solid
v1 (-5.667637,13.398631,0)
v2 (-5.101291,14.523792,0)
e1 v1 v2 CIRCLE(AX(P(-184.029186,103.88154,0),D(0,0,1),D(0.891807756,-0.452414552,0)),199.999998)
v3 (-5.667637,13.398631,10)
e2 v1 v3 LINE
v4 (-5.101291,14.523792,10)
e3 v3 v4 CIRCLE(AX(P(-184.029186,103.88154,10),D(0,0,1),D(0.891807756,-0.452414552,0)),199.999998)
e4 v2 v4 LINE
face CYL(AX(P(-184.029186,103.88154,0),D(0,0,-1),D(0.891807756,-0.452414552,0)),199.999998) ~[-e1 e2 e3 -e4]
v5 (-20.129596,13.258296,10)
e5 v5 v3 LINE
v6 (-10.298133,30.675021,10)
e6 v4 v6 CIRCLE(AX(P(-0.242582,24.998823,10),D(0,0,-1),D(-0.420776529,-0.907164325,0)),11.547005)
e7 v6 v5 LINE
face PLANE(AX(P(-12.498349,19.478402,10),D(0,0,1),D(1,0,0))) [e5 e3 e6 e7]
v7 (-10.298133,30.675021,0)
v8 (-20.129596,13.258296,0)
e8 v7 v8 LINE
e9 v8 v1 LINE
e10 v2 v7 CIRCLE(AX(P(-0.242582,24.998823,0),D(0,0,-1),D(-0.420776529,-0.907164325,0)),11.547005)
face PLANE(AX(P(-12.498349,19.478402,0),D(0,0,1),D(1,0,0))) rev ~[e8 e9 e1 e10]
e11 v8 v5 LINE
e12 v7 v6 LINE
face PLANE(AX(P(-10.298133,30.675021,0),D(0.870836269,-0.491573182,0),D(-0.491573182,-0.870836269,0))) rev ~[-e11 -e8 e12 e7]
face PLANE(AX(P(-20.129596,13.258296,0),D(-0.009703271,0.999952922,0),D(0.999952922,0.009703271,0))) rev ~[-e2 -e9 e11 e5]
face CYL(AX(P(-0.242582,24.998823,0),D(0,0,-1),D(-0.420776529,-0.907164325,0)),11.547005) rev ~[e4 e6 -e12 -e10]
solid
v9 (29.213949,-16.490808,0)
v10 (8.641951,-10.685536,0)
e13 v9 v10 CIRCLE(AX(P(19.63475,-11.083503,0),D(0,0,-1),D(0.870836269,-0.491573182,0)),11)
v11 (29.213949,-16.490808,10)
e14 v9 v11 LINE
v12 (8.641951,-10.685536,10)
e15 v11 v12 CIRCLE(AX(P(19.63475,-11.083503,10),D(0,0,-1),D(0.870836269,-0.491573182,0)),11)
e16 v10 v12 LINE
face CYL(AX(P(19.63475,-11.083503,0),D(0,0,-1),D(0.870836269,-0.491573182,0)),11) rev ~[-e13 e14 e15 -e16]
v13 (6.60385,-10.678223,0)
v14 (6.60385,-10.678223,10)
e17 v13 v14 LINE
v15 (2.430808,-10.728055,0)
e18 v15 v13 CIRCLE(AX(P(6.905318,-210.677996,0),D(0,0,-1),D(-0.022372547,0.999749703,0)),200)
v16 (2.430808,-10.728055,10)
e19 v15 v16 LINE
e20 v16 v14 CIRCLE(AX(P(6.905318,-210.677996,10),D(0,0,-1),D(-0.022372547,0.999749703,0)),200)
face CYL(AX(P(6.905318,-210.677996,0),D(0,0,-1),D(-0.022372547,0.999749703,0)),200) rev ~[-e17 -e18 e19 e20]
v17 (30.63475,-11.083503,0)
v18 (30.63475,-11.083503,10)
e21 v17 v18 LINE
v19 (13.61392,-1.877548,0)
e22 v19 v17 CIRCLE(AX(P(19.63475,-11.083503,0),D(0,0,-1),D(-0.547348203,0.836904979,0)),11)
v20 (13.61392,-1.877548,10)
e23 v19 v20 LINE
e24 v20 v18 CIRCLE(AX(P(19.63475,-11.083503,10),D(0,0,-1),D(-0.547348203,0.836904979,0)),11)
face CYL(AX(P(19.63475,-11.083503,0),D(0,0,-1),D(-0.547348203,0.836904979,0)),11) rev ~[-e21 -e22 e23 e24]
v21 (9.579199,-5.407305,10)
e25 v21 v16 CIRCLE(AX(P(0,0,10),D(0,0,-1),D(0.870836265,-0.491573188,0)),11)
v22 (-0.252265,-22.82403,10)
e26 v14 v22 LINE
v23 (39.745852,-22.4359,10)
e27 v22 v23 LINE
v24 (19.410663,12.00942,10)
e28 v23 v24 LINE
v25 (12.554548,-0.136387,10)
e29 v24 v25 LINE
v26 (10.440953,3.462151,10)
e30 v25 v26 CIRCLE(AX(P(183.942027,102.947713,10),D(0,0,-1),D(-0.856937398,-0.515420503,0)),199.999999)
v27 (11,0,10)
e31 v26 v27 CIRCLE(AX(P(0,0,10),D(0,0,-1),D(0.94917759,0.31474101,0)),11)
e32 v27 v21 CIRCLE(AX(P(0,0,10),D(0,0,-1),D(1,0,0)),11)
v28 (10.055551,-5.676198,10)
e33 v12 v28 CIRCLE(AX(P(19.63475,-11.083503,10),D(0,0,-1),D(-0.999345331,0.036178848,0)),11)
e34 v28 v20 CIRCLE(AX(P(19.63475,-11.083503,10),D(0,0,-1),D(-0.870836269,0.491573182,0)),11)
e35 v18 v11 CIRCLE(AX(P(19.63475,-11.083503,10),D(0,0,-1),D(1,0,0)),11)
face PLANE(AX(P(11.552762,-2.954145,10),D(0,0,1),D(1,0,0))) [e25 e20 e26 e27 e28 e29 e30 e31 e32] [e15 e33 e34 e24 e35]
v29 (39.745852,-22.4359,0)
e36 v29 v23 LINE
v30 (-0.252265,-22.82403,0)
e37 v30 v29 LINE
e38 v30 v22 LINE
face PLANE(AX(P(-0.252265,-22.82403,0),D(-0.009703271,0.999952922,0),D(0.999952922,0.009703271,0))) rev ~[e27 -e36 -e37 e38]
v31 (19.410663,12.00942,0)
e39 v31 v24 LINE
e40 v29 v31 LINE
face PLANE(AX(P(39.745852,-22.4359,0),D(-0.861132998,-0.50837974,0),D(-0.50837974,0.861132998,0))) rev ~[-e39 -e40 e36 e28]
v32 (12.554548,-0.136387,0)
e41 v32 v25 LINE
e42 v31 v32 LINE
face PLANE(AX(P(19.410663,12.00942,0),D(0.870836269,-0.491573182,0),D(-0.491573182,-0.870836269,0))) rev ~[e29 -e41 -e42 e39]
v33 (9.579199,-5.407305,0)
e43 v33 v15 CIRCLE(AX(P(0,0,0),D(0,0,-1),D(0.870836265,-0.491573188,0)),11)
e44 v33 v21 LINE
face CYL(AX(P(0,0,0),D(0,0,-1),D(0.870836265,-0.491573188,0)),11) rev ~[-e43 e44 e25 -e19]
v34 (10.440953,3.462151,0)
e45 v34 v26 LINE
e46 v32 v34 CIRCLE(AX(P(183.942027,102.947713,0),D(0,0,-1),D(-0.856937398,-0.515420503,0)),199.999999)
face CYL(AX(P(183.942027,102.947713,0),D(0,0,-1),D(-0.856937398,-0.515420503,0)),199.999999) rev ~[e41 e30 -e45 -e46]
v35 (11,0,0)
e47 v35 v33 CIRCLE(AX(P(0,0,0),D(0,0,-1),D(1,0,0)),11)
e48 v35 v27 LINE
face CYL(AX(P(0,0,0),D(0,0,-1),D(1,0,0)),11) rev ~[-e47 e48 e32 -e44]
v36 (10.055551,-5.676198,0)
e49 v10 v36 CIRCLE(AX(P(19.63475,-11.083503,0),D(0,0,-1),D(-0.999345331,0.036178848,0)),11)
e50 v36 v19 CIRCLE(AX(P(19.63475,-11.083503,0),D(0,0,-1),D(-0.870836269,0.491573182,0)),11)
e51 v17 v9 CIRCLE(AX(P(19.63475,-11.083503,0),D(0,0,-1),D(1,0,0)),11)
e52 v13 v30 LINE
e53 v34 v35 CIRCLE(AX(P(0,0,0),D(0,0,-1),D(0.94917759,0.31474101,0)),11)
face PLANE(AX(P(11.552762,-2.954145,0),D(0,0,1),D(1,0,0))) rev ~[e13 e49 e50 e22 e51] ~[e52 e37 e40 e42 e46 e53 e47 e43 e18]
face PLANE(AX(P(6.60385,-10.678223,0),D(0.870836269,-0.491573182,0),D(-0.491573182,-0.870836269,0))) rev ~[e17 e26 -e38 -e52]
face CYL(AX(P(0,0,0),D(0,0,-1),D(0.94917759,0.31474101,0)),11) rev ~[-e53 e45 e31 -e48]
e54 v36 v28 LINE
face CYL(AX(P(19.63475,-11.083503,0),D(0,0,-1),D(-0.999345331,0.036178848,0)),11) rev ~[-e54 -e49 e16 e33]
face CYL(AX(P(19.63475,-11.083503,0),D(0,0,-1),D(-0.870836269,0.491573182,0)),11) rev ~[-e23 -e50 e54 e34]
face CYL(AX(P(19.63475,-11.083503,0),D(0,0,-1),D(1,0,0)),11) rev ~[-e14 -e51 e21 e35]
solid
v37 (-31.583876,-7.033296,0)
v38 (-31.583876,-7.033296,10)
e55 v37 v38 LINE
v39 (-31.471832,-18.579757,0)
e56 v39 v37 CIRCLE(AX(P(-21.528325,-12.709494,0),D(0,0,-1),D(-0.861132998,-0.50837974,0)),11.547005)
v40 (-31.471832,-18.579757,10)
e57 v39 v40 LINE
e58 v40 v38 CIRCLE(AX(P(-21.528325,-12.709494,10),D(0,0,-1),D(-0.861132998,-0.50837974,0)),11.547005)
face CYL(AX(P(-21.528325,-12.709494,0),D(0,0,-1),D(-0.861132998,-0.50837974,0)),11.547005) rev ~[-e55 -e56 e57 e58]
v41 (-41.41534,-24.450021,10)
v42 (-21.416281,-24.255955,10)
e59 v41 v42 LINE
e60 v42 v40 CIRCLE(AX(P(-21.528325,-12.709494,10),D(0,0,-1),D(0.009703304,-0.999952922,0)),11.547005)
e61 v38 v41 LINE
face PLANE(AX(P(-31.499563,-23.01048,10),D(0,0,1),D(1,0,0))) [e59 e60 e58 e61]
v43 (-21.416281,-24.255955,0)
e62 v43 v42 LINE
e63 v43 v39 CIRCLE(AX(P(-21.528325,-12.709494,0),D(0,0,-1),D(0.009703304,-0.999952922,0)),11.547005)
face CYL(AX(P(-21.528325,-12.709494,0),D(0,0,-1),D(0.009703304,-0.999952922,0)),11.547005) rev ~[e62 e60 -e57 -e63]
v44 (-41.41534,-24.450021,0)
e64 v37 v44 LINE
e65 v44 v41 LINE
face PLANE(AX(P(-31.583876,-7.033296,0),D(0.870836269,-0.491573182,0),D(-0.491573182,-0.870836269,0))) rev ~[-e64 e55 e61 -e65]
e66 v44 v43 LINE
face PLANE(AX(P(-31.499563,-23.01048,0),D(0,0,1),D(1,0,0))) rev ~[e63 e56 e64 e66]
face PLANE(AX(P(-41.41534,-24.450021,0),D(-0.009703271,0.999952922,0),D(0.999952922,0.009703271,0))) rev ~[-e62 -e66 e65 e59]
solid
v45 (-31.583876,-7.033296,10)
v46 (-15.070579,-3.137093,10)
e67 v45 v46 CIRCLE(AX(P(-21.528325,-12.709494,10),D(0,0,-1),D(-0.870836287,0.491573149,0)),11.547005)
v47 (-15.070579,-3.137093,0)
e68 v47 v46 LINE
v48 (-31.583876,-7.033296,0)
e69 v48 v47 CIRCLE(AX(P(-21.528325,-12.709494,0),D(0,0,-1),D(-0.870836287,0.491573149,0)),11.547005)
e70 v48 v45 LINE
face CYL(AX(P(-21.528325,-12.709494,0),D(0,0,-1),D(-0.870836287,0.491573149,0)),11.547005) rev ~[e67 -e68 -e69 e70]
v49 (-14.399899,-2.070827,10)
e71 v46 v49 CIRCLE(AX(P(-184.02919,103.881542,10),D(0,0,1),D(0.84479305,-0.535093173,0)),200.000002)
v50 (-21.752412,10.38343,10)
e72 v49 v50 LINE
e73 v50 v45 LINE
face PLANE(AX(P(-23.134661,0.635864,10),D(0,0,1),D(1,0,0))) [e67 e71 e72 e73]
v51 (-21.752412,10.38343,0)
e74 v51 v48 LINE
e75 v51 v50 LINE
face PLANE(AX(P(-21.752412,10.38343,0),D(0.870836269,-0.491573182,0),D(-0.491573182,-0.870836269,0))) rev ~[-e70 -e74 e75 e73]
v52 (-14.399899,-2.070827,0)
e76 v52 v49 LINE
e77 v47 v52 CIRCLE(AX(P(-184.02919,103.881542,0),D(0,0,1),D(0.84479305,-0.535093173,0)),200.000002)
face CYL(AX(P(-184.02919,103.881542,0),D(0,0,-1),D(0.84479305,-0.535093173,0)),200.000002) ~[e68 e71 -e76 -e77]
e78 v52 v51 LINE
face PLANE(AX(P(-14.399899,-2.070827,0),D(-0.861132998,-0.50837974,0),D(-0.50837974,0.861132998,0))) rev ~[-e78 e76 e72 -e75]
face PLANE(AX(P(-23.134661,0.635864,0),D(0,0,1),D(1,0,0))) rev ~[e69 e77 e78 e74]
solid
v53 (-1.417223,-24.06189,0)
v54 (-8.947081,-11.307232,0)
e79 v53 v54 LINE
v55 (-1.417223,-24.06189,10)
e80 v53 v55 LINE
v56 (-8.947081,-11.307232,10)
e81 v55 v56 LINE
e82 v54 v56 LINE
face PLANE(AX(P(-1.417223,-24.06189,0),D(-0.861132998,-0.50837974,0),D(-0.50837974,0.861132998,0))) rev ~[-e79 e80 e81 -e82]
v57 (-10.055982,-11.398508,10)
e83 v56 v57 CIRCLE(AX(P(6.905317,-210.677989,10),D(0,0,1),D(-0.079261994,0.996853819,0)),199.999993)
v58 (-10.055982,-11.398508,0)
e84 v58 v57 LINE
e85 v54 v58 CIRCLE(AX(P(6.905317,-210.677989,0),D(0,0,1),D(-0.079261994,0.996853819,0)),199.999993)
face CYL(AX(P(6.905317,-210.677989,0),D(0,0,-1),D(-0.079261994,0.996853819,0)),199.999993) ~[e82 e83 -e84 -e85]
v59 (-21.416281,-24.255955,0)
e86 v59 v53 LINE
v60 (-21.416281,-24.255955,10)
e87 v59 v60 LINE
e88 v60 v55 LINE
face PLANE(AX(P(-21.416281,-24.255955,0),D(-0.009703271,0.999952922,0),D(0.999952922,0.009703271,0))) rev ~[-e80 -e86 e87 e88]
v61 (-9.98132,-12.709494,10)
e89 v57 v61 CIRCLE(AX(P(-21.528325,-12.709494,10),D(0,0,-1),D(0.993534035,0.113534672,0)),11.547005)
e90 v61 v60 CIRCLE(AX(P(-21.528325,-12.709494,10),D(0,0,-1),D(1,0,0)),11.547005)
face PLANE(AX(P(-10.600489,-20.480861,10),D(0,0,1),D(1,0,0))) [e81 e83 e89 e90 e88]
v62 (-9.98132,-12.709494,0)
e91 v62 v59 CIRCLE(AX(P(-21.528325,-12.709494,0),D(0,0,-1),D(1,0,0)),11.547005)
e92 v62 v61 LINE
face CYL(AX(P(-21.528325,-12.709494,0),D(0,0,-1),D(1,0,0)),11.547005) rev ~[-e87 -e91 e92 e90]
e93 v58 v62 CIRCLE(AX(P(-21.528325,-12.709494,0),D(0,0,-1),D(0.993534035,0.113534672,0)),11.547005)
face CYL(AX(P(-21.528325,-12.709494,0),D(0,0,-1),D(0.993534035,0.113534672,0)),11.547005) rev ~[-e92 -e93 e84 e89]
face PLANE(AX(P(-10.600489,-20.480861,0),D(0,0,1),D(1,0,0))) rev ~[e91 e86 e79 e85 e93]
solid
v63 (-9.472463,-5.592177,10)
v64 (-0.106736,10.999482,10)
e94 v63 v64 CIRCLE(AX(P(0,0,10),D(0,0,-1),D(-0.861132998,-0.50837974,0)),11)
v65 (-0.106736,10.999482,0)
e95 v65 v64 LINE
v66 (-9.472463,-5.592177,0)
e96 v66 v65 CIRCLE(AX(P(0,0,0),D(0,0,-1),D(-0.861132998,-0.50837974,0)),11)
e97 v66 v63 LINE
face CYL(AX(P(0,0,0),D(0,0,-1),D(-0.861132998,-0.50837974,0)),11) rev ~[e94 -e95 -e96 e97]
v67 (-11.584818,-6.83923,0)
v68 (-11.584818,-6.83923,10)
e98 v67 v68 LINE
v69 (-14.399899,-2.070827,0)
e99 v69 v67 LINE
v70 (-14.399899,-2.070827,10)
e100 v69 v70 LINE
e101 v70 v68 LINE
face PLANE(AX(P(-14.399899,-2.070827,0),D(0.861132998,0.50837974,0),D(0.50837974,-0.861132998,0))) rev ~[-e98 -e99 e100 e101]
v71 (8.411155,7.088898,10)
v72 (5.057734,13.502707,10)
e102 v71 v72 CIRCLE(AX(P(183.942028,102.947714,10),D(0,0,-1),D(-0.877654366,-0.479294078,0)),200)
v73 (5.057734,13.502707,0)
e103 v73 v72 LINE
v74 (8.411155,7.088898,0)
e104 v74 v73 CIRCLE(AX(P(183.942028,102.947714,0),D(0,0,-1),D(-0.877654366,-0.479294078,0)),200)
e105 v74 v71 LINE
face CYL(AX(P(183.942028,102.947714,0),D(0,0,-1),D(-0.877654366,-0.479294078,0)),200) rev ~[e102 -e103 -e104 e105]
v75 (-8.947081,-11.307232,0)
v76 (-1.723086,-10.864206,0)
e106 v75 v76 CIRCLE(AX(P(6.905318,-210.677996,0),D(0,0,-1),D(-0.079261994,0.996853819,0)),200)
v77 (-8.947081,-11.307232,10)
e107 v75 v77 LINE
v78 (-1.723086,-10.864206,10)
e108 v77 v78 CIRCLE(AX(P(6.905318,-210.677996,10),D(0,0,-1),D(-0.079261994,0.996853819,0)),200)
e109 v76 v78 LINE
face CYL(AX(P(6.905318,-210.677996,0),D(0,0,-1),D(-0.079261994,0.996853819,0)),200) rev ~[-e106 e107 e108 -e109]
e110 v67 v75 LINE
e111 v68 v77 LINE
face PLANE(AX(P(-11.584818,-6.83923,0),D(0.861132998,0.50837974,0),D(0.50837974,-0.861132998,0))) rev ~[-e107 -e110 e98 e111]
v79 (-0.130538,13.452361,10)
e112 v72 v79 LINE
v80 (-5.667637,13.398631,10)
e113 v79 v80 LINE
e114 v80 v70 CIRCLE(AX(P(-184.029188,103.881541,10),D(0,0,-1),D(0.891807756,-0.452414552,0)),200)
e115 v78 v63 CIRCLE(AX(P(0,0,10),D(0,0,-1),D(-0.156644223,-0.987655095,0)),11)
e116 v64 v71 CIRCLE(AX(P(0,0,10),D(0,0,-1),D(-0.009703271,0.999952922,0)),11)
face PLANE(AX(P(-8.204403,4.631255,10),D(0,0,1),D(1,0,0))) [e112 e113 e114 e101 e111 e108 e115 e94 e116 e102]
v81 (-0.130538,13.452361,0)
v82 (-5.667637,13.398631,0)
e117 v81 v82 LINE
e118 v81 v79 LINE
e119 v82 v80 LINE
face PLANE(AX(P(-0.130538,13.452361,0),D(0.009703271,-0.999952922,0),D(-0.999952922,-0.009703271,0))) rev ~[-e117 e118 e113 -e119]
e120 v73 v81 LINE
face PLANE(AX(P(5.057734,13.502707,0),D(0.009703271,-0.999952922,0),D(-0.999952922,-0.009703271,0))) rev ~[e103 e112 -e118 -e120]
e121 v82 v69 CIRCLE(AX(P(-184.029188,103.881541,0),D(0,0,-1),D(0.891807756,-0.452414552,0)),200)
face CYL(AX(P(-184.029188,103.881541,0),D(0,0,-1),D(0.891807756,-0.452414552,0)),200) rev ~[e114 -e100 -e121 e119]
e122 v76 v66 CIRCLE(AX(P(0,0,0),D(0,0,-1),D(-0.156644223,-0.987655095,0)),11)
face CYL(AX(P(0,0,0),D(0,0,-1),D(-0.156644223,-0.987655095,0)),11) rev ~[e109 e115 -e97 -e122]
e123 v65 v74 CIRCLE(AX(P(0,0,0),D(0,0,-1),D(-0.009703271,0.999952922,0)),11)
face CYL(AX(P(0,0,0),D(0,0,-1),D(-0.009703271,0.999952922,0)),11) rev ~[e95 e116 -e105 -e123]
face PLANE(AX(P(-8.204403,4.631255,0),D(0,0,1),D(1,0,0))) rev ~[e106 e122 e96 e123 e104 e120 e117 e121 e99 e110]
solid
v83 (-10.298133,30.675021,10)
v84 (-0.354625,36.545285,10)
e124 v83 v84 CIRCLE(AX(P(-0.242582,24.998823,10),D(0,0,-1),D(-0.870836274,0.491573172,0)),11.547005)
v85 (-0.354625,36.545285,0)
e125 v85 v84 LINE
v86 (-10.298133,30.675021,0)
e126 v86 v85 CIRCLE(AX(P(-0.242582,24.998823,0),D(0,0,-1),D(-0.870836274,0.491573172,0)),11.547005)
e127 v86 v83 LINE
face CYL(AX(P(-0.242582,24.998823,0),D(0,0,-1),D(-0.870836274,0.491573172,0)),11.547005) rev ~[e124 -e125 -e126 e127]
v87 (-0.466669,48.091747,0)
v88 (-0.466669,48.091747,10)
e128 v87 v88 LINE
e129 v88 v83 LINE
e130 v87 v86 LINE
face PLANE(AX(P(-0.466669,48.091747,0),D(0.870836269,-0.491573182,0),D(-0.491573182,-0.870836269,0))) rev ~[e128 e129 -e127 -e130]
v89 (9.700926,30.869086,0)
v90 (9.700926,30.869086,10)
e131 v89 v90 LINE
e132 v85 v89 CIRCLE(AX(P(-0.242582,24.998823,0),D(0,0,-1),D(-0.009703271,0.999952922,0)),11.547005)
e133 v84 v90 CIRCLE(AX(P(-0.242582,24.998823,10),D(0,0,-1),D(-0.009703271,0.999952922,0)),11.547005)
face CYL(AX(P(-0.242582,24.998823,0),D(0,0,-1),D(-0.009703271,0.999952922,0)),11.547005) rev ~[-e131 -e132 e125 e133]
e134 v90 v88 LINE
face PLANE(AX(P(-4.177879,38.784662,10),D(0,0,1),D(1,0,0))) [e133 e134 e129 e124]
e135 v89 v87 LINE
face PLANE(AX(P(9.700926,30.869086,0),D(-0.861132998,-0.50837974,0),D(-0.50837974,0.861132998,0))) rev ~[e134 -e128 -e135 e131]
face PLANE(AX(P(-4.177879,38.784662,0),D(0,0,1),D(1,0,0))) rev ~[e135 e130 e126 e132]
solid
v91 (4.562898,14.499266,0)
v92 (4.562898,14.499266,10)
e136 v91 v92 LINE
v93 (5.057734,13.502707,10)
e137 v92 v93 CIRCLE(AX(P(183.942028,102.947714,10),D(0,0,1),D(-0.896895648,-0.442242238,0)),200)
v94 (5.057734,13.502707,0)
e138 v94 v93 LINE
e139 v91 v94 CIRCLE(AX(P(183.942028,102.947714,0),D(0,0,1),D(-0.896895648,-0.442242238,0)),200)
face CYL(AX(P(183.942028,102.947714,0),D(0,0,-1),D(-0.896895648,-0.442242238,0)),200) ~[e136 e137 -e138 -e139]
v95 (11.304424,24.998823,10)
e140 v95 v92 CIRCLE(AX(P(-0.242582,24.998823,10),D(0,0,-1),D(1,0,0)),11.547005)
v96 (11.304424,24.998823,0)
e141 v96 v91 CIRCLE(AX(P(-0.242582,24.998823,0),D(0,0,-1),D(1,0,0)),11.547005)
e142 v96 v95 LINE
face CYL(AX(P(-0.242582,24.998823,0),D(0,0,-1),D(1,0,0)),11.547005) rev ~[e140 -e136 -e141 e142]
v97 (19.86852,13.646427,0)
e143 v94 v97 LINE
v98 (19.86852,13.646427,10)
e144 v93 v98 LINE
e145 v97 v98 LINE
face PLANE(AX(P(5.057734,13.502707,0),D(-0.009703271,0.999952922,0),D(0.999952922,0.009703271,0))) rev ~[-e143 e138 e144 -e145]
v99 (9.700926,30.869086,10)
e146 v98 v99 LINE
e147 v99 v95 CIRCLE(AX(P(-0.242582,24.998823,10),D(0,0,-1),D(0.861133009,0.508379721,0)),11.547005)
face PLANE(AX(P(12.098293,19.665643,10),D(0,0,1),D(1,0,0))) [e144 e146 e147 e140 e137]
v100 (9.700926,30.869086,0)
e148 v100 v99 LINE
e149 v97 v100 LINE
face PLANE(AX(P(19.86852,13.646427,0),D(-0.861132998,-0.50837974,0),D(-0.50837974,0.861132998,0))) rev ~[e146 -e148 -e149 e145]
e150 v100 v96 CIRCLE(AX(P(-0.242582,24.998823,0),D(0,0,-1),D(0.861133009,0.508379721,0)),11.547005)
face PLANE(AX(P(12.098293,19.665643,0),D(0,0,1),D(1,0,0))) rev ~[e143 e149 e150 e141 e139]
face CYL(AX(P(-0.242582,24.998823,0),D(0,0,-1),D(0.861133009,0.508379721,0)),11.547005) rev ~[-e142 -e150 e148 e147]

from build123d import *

# Parameters (mm, degrees)
F1_DEPTH = 10


with BuildPart() as f1:
    # F0 (on Top) → F1 (new body)
    with BuildSketch(Plane.XY):
        with BuildLine():
            ThreePointArc((-9.4724629741, -5.5921771434), (-9.5791989557, 5.4073050003), (-0.1067359816, 10.9994821437))
            Line((-0.1067359816, 10.9994821437), (-0.1305380532, 13.4523612782))
            Line((-0.1305380315, 13.4523612785), (-5.6676372798, 13.3986307741))
            ThreePointArc((-5.6676372798, 13.3986307741), (-9.8619346797, 5.5669048062), (-14.3998991761, -2.070826568))
            Line((-14.3998991761, -2.070826568), (-11.5848176191, -6.8392298452))
            Line((-11.5848175812, -6.8392299094), (-9.4724629741, -5.5921771434))
        make_face()
        with BuildLine():
            Line((-0.1305380532, 13.4523612782), (-0.1067359816, 10.9994821437))
            ThreePointArc((-0.1067359816, 10.9994821437), (4.5895542781, 9.9967990641), (8.4111545556, 7.0888982954))
            ThreePointArc((8.4111545556, 7.0888982954), (6.7054289822, 10.2806322034), (5.0577336181, 13.5027068547))
            Line((5.0577336181, 13.5027068547), (-0.1305380315, 13.4523612785))
        make_face()
        with BuildLine():
            ThreePointArc((-1.7230864536, -10.8642060489), (-6.1873786002, -9.0948527233), (-9.4724629741, -5.5921771434))
            Line((-9.4724629741, -5.5921771434), (-11.5848175812, -6.8392299094))
            Line((-11.5848176191, -6.8392298452), (-8.9470811973, -11.3072321903))
            ThreePointArc((-8.9470811973, -11.3072321903), (-5.3370880091, -11.0530388546), (-1.7230864536, -10.8642060489))
        make_face()
    extrude(amount=F1_DEPTH)


with BuildPart() as f1b:
    # F0 (on Top) → F1, piece 2 (new body)
    with BuildSketch(Plane.XY):
        with BuildLine():
            Line((12.5545481824, -0.1363868252), (9.5791989174, -5.4073050681))
            Line((9.5791989557, -5.4073050003), (10.0555510831, -5.6761981773))
            ThreePointArc((10.0555510831, -5.6761981773), (11.606819874, -3.563374371), (13.6139198008, -1.8775484067))
            ThreePointArc((13.6139198008, -1.8775484067), (13.0820160477, -1.0083170753), (12.5545481824, -0.1363868252))
        make_face()
        with BuildLine():
            Line((6.6038497291, -10.6782231755), (9.5791989174, -5.4073050681))
            ThreePointArc((9.5791989174, -5.4073050681), (6.5679269383, -8.8239637201), (2.4308083201, -10.7280553182))
            ThreePointArc((2.4308083201, -10.7280553182), (4.517199042, -10.692254253), (6.6038497291, -10.6782231755))
        make_face()
        with BuildLine():
            Line((10.0555510831, -5.6761981773), (9.5791989557, -5.4073050003))
            Line((9.5791989174, -5.4073050681), (6.6038497291, -10.6782231755))
            ThreePointArc((6.6038497291, -10.6782231755), (7.6229098775, -10.6792833185), (8.6419513958, -10.6855358516))
            ThreePointArc((8.6419513958, -10.6855358516), (9.0481954867, -8.0960523053), (10.0555510831, -5.6761981773))
        make_face()
        with BuildLine():
            ThreePointArc((11, 0), (10.6388718408, -2.7954258985), (9.5791989174, -5.4073050681))
            Line((9.5791989174, -5.4073050681), (12.5545481824, -0.1363868252))
            ThreePointArc((12.5545481824, -0.1363868252), (11.4883643789, 1.6573690273), (10.4409534845, 3.4621511137))
            ThreePointArc((10.4409534845, 3.4621511137), (10.8593390298, 1.7534981708), (11, 0))
        make_face()
        with BuildLine():
            ThreePointArc((8.6419513958, -10.6855358516), (7.6229098775, -10.6792833185), (6.6038497291, -10.6782231755))
            Line((6.6038497291, -10.6782231755), (-0.2522646812, -22.8240303744))
            Line((-0.2522646812, -22.8240303744), (39.7458522051, -22.4358995322))
            Line((39.7458522051, -22.4358995322), (19.4106625927, 12.0094203738))
            Line((19.4106625927, 12.0094203738), (12.5545481824, -0.1363868252))
            ThreePointArc((12.5545481824, -0.1363868252), (13.0820160477, -1.0083170753), (13.6139198008, -1.8775484067))
            ThreePointArc((13.6139198008, -1.8775484067), (24.8678594101, -1.4080411055), (30.6347500389, -11.0835031776))
            ThreePointArc((30.6347500389, -11.0835031776), (30.2736218896, -13.8789290385), (29.2139489946, -16.4908081779))
            ThreePointArc((29.2139489946, -16.4908081779), (16.6472991665, -21.6700577298), (8.6419513958, -10.6855358516))
        make_face()
    extrude(amount=F1_DEPTH)


with BuildPart() as f1c:
    # F0 (on Top) → F1, piece 3 (new body)
    with BuildSketch(Plane.XY):
        with BuildLine():
            ThreePointArc((-5.6676372798, 13.3986307741), (-5.3835781261, 13.9607653638), (-5.1012906228, 14.5237917089))
            ThreePointArc((-5.1012906228, 14.5237917089), (-11.2345943606, 21.4620176196), (-10.2981329222, 30.6750211202))
            Line((-10.2981329222, 30.6750211202), (-20.1295964964, 13.2582958572))
            Line((-20.1295964964, 13.2582958572), (-5.6676372798, 13.3986307741))
        make_face()
    extrude(amount=F1_DEPTH)


with BuildPart() as f1d:
    # F0 (on Top) → F1, piece 4 (new body)
    with BuildSketch(Plane.XY):
        with BuildLine():
            ThreePointArc((11.3044236075, 24.9988230539), (9.473956651, 18.7600560024), (4.5628983325, 14.4992661939))
            ThreePointArc((4.5628983325, 14.4992661939), (4.8096229597, 14.0006424117), (5.0577336181, 13.5027068547))
            Line((5.0577336181, 13.5027068547), (19.8685203899, 13.6464266993))
            Line((19.8685203899, 13.6464266993), (9.7009257177, 30.8690864252))
            ThreePointArc((9.7009257177, 30.8690864252), (10.8963380075, 28.0414862595), (11.3044236075, 24.9988230539))
        make_face()
    extrude(amount=F1_DEPTH)


with BuildPart() as f1e:
    # F0 (on Top) → F1, piece 5 (new body)
    with BuildSketch(Plane.XY):
        with BuildLine():
            ThreePointArc((-8.9470811973, -11.3072321903), (-9.501595119, -11.3520989755), (-10.0559820928, -11.3985080385))
            ThreePointArc((-10.0559820928, -11.3985080385), (-10.0000003021, -12.0529385986), (-9.9813195575, -12.7094935078))
            ThreePointArc((-9.9813195575, -12.7094935078), (-13.3238411908, -20.8347491789), (-21.4162808358, -24.2559552797))
            Line((-21.4162808358, -24.2559552797), (-1.417222775, -24.0618898624))
            Line((-1.417222775, -24.0618898624), (-8.9470811973, -11.3072321903))
        make_face()
    extrude(amount=F1_DEPTH)


with BuildPart() as f1f:
    # F0 (on Top) → F1, piece 6 (new body)
    with BuildSketch(Plane.XY):
        with BuildLine():
            ThreePointArc((-31.5838762413, -7.0332957148), (-24.1799561682, -1.471069011), (-15.0705785167, -3.1370933673))
            ThreePointArc((-15.0705785167, -3.1370933673), (-14.7343993878, -2.6044879851), (-14.3998991761, -2.070826568))
            Line((-14.3998991761, -2.070826568), (-21.7524123874, 10.3834300436))
            Line((-21.7524123874, 10.3834300436), (-31.5838762413, -7.0332957148))
        make_face()
    extrude(amount=F1_DEPTH)


with BuildPart() as f1g:
    # F0 (on Top) → F1, piece 7 (new body)
    with BuildSketch(Plane.XY):
        with BuildLine():
            ThreePointArc((-10.2981329222, 30.6750211202), (-6.1128454296, 34.9423303815), (-0.3546254994, 36.5452848296))
            Line((-0.3546254994, 36.5452848296), (-0.4666692225, 48.0917466053))
            Line((-0.4666692225, 48.0917466053), (-10.2981329222, 30.6750211202))
        make_face()
        with BuildLine():
            Line((-0.4666692225, 48.0917466053), (-0.3546254994, 36.5452848296))
            ThreePointArc((-0.3546254994, 36.5452848296), (5.4336165158, 35.0543740722), (9.7009257177, 30.8690864252))
            Line((9.7009257177, 30.8690864252), (-0.4666692225, 48.0917466053))
        make_face()
    extrude(amount=F1_DEPTH)


with BuildPart() as f1h:
    # F0 (on Top) → F1, piece 8 (new body)
    with BuildSketch(Plane.XY):
        with BuildLine():
            ThreePointArc((-21.4162808358, -24.2559552797), (-27.204522952, -22.7650446849), (-31.4718323013, -18.5797571062))
            Line((-31.4718323013, -18.5797571062), (-41.4153396613, -24.4500207045))
            Line((-41.4153396613, -24.4500207045), (-21.4162808358, -24.2559552797))
        make_face()
        with BuildLine():
            Line((-41.4153396613, -24.4500207045), (-31.4718323013, -18.5797571062))
            ThreePointArc((-31.4718323013, -18.5797571062), (-33.0747867148, -12.8215374515), (-31.5838762413, -7.0332957148))
            Line((-31.5838762413, -7.0332957148), (-41.4153396613, -24.4500207045))
        make_face()
    extrude(amount=F1_DEPTH)


solid = Compound([f1.part, f1b.part, f1c.part, f1d.part, f1e.part, f1f.part, f1g.part, f1h.part])
